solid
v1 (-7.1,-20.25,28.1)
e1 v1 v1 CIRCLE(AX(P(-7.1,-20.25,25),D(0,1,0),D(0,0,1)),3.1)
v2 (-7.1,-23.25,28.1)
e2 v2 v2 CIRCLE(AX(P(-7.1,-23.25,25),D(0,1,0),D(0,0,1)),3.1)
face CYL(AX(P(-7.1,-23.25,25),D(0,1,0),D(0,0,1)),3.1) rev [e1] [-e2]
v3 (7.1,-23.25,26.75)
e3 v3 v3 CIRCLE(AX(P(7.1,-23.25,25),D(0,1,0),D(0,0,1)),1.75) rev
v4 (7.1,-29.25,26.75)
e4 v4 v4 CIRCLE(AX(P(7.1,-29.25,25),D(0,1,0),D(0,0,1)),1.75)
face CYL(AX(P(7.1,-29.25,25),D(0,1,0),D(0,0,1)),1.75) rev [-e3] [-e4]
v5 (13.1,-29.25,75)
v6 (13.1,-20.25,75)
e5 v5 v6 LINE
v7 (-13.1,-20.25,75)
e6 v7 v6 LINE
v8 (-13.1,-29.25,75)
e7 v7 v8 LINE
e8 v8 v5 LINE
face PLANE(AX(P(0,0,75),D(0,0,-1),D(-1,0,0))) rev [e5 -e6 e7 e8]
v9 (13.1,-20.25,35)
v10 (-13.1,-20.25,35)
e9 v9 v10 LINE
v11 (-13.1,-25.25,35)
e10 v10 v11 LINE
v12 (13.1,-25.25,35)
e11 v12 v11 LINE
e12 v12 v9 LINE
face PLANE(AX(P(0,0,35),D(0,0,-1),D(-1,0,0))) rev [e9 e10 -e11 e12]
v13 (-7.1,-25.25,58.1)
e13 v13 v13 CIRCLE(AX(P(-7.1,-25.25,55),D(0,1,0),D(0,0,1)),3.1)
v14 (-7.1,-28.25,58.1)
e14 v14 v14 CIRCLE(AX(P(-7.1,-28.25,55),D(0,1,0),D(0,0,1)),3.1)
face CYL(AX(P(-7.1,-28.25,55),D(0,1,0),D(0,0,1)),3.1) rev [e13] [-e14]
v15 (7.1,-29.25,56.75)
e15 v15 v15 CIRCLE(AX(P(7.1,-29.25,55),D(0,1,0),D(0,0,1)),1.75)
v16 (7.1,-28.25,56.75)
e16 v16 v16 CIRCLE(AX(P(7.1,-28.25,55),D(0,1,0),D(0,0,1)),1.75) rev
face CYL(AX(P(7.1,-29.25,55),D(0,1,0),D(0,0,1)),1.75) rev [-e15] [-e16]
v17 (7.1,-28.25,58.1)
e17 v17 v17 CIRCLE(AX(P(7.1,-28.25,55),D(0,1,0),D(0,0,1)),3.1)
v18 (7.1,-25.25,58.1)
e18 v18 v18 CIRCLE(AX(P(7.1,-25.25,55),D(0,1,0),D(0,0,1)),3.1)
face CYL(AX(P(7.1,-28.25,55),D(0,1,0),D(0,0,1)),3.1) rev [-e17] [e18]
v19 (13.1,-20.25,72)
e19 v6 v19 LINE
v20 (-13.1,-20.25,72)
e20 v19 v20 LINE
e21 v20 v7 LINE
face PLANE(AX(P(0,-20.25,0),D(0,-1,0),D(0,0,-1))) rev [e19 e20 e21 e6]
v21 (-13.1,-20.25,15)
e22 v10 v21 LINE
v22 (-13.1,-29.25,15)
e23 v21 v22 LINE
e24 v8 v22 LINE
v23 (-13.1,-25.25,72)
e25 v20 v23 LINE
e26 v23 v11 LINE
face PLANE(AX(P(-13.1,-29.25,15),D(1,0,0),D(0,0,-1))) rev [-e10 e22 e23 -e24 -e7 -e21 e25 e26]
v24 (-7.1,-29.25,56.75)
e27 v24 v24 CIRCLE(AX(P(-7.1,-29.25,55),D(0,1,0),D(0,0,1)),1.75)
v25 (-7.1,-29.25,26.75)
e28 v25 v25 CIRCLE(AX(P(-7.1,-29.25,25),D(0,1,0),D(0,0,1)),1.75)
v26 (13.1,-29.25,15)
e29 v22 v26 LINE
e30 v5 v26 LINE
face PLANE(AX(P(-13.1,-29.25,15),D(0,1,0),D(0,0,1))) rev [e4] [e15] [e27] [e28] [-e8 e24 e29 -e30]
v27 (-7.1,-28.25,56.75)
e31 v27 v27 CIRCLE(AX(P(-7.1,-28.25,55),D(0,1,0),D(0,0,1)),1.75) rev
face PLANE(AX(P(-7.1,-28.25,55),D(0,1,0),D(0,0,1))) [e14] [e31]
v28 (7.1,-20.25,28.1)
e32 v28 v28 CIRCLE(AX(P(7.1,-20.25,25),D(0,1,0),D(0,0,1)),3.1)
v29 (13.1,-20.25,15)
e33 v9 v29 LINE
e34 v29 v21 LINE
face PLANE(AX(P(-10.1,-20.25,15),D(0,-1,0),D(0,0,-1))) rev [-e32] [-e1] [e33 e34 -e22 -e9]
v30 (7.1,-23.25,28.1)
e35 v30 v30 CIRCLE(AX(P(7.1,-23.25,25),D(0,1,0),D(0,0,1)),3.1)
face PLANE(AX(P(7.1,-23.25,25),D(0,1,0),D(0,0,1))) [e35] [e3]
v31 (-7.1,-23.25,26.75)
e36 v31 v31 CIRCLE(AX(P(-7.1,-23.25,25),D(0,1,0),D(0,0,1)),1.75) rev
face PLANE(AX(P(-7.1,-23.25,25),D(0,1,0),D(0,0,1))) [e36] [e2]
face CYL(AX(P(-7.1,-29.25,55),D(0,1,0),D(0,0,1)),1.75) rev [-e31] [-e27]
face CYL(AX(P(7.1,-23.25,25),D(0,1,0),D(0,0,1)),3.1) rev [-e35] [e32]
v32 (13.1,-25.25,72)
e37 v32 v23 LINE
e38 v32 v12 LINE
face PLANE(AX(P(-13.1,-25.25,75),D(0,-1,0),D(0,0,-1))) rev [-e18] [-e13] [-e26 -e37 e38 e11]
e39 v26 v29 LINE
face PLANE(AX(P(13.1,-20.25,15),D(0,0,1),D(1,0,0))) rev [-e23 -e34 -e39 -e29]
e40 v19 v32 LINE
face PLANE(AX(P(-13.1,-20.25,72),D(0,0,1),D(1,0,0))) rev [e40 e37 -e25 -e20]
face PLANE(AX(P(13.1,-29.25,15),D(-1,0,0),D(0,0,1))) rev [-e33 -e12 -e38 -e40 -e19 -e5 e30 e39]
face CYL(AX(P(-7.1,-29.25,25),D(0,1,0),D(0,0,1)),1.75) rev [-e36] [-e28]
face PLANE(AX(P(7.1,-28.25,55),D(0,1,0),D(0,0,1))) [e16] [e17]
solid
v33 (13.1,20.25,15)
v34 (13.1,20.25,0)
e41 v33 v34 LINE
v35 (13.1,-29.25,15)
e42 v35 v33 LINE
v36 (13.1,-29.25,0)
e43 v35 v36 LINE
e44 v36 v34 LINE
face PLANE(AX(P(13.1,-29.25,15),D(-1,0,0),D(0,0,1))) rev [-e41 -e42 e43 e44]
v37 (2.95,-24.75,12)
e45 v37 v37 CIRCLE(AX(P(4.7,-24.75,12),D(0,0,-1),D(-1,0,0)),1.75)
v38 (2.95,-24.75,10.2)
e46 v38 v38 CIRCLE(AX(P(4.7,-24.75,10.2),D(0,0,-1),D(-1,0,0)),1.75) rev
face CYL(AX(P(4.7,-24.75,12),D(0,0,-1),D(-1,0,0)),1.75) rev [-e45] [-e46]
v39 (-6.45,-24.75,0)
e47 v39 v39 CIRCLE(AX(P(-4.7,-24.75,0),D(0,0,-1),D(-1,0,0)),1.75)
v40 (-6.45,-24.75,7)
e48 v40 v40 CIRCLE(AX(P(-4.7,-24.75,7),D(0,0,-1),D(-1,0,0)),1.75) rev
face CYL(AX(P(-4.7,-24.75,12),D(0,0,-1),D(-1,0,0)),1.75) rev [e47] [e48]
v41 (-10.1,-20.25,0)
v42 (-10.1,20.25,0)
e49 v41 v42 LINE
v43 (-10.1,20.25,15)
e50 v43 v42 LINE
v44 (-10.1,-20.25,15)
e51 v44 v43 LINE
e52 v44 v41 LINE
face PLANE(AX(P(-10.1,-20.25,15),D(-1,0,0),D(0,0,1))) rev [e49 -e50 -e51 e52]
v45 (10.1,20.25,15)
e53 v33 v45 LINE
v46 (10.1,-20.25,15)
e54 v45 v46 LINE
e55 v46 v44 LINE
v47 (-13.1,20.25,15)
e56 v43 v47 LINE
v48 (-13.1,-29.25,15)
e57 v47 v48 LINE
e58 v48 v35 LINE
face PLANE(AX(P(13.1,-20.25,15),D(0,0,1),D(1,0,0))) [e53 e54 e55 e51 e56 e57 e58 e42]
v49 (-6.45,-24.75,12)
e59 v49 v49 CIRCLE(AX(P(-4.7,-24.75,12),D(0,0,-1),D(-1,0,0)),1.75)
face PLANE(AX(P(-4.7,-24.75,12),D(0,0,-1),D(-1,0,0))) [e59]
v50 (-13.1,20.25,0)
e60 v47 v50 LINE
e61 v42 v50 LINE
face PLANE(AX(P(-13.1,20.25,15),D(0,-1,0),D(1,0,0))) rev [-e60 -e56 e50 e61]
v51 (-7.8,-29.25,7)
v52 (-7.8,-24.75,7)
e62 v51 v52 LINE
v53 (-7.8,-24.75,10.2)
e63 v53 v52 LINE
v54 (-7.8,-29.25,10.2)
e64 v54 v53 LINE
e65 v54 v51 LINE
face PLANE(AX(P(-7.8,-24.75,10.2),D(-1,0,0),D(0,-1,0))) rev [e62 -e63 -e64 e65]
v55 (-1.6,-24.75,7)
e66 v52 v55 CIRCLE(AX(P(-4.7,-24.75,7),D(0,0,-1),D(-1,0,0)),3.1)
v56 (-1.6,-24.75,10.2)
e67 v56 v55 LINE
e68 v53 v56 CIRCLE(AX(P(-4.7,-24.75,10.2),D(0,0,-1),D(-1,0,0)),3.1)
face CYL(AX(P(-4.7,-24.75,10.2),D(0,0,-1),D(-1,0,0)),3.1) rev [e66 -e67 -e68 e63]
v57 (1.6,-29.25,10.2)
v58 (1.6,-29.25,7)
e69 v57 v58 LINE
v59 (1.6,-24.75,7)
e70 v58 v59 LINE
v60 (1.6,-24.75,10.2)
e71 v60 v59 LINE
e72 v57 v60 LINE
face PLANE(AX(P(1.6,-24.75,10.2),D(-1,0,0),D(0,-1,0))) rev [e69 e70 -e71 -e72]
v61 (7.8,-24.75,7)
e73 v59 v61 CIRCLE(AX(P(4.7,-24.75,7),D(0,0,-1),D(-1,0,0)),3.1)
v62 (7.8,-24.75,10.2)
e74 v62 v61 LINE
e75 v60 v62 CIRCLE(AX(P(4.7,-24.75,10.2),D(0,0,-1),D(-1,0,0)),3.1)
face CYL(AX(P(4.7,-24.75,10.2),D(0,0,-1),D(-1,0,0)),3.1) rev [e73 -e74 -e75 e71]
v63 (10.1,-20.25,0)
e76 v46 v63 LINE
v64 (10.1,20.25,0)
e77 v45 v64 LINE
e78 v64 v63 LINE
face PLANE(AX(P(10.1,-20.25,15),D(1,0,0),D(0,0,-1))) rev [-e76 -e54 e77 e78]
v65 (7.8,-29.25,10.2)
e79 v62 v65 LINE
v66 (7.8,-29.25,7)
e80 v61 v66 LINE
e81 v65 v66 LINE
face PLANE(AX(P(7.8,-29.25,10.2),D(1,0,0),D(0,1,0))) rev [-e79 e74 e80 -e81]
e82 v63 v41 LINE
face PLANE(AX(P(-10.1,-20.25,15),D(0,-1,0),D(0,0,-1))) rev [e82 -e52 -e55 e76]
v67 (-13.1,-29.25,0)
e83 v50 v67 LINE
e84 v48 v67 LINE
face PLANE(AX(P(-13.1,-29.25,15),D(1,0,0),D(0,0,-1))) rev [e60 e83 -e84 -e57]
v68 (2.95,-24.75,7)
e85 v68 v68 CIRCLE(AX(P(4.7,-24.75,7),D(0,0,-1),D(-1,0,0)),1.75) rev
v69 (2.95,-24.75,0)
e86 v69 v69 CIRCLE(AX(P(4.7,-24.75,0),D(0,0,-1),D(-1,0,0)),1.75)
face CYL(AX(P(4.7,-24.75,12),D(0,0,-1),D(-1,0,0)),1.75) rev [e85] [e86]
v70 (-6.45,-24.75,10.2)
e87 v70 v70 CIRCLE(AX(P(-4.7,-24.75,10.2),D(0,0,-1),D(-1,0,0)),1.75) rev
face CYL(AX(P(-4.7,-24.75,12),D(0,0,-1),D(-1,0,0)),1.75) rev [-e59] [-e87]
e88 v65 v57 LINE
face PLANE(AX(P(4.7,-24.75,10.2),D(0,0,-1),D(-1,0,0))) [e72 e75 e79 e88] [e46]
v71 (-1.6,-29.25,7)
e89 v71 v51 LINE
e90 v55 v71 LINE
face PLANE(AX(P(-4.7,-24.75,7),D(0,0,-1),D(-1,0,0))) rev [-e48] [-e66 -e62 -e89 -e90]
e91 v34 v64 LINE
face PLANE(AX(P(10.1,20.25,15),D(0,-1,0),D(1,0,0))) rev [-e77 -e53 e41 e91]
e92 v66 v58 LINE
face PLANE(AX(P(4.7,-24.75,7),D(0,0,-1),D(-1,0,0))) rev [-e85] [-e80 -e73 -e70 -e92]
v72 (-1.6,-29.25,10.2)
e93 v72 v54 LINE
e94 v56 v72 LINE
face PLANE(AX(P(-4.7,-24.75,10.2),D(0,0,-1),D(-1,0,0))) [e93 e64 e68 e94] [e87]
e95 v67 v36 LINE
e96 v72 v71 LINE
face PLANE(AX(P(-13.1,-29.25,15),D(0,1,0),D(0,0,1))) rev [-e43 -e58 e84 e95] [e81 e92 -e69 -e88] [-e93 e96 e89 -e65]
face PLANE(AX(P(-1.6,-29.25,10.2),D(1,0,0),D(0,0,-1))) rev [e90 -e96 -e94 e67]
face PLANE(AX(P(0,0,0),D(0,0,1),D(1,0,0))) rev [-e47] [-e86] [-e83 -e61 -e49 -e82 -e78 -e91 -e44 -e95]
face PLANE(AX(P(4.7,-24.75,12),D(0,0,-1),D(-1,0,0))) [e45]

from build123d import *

# Parameters (mm, degrees)
SALIENTE_EXTRUIR1_DEPTH = 15
CROQUIS3_R              = 1.75
CORTAR_EXTRUIR1_DEPTH   = 12
CORTAR_EXTRUIR2_DEPTH   = 3.2
CROQUIS6_W              = 26.2
CROQUIS6_H              = 9
SALIENTE_EXTRUIR2_DEPTH = 20
CROQUIS8_W              = 26.2
CROQUIS8_H              = 4
SALIENTE_EXTRUIR4_DEPTH = 40
CROQUIS9_W              = 26.2
CROQUIS9_H              = 3
SALIENTE_EXTRUIR5_DEPTH = 5
CROQUIS10_R             = 1.75
CORTAR_EXTRUIR3_DEPTH   = 87.237230939
CROQUIS11_R             = 3.1
CORTAR_EXTRUIR4_DEPTH   = 3
CROQUIS12_R             = 3.1
CORTAR_EXTRUIR5_DEPTH   = 3


with BuildPart() as part:
    # Croquis1 → Saliente-Extruir1 (new body)
    with BuildSketch(Plane.XY):
        Polygon((-13.1, 20.25), (-10.1, 20.25), (-10.1, -20.25), (10.1, -20.25), (10.1, 20.25), (13.1, 20.25), (13.1, -29.25), (-13.1, -29.25), align=None)
    extrude(amount=SALIENTE_EXTRUIR1_DEPTH)

    # Croquis3 → Cortar-Extruir1 (cut)
    with BuildSketch(Plane(origin=(0, 0, 0), x_dir=(-1, 0, 0), z_dir=(0, 0, -1))):
        with Locations((4.7, 25.25)):
            Circle(CROQUIS3_R)
        with Locations((-4.7, 25.25)):
            Circle(CROQUIS3_R)
        with Locations((4.7, -24.75)):
            Circle(CROQUIS3_R)
        with Locations((-4.7, -24.75)):
            Circle(CROQUIS3_R)
    extrude(amount=-CORTAR_EXTRUIR1_DEPTH, mode=Mode.SUBTRACT)

    # Croquis4 → Cortar-Extruir2 (cut)
    with BuildSketch(Plane(origin=(0, 0, 7), x_dir=(-1, 0, 0), z_dir=(0, 0, -1))):
        with BuildLine():
            Line((7.8, -24.75), (7.8, -29.25))
            Line((7.8, -29.25), (1.6, -29.25))
            Line((1.6, -29.25), (1.6, -24.75))
            ThreePointArc((1.6, -24.75), (4.7, -21.65), (7.8, -24.75))
        make_face()
        with BuildLine():
            Line((-1.6, -24.75), (-1.6, -29.25))
            Line((-1.6, -29.25), (-7.8, -29.25))
            Line((-7.8, -29.25), (-7.8, -24.75))
            ThreePointArc((-7.8, -24.75), (-4.7, -21.65), (-1.6, -24.75))
        make_face()
    extrude(amount=-CORTAR_EXTRUIR2_DEPTH, mode=Mode.SUBTRACT)

    # Croquis6 → Saliente-Extruir2 (add)
    with BuildSketch(Plane.XY.offset(15)):
        with Locations((0, -24.75)):
            Rectangle(CROQUIS6_W, CROQUIS6_H)
    extrude(amount=SALIENTE_EXTRUIR2_DEPTH)

    # Croquis8 → Saliente-Extruir4 (add)
    with BuildSketch(Plane.XY.offset(35)):
        with Locations((0, -27.25)):
            Rectangle(CROQUIS8_W, CROQUIS8_H)
    extrude(amount=SALIENTE_EXTRUIR4_DEPTH)

    # Croquis9 → Saliente-Extruir5 (add)
    with BuildSketch(Plane(origin=(0, -25.25, 0), x_dir=(1, 0, 0), z_dir=(0, 1, 0))):
        with Locations((0, -73.5)):
            Rectangle(CROQUIS9_W, CROQUIS9_H)
    extrude(amount=SALIENTE_EXTRUIR5_DEPTH)

    # Croquis10 → Cortar-Extruir3 (cut, through all)
    with BuildSketch(Plane(origin=(0, -20.25, 0), x_dir=(1, 0, 0), z_dir=(0, 1, 0))):
        with Locations((-7.1, -25)):
            Circle(CROQUIS10_R)
        with Locations((7.1, -25)):
            Circle(CROQUIS10_R)
        with Locations((-7.1, -55)):
            Circle(CROQUIS10_R)
        with Locations((7.1, -55)):
            Circle(CROQUIS10_R)
    extrude(amount=-CORTAR_EXTRUIR3_DEPTH, mode=Mode.SUBTRACT)

    # Croquis11 → Cortar-Extruir4 (cut)
    with BuildSketch(Plane(origin=(0, -20.25, 0), x_dir=(1, 0, 0), z_dir=(0, 1, 0))):
        with Locations((-7.1, -25)):
            Circle(CROQUIS11_R)
        with Locations((7.1, -25)):
            Circle(CROQUIS11_R)
    extrude(amount=-CORTAR_EXTRUIR4_DEPTH, mode=Mode.SUBTRACT)

    # Croquis12 → Cortar-Extruir5 (cut)
    with BuildSketch(Plane(origin=(0, -25.25, 0), x_dir=(1, 0, 0), z_dir=(0, 1, 0))):
        with Locations((-7.1, -55)):
            Circle(CROQUIS12_R)
        with Locations((7.1, -55)):
            Circle(CROQUIS12_R)
    extrude(amount=-CORTAR_EXTRUIR5_DEPTH, mode=Mode.SUBTRACT)


with BuildPart() as body_2:
    # Partir1: the piece on the far side of the plane
    add(part.part)
    split(bisect_by=Plane.XY.offset(15), keep=Keep.BOTTOM)


with BuildPart() as part_1:
    add(part.part)

    # Partir1
    split(bisect_by=Plane.XY.offset(15), keep=Keep.TOP)


solid = Compound([body_2.part, part_1.part])
